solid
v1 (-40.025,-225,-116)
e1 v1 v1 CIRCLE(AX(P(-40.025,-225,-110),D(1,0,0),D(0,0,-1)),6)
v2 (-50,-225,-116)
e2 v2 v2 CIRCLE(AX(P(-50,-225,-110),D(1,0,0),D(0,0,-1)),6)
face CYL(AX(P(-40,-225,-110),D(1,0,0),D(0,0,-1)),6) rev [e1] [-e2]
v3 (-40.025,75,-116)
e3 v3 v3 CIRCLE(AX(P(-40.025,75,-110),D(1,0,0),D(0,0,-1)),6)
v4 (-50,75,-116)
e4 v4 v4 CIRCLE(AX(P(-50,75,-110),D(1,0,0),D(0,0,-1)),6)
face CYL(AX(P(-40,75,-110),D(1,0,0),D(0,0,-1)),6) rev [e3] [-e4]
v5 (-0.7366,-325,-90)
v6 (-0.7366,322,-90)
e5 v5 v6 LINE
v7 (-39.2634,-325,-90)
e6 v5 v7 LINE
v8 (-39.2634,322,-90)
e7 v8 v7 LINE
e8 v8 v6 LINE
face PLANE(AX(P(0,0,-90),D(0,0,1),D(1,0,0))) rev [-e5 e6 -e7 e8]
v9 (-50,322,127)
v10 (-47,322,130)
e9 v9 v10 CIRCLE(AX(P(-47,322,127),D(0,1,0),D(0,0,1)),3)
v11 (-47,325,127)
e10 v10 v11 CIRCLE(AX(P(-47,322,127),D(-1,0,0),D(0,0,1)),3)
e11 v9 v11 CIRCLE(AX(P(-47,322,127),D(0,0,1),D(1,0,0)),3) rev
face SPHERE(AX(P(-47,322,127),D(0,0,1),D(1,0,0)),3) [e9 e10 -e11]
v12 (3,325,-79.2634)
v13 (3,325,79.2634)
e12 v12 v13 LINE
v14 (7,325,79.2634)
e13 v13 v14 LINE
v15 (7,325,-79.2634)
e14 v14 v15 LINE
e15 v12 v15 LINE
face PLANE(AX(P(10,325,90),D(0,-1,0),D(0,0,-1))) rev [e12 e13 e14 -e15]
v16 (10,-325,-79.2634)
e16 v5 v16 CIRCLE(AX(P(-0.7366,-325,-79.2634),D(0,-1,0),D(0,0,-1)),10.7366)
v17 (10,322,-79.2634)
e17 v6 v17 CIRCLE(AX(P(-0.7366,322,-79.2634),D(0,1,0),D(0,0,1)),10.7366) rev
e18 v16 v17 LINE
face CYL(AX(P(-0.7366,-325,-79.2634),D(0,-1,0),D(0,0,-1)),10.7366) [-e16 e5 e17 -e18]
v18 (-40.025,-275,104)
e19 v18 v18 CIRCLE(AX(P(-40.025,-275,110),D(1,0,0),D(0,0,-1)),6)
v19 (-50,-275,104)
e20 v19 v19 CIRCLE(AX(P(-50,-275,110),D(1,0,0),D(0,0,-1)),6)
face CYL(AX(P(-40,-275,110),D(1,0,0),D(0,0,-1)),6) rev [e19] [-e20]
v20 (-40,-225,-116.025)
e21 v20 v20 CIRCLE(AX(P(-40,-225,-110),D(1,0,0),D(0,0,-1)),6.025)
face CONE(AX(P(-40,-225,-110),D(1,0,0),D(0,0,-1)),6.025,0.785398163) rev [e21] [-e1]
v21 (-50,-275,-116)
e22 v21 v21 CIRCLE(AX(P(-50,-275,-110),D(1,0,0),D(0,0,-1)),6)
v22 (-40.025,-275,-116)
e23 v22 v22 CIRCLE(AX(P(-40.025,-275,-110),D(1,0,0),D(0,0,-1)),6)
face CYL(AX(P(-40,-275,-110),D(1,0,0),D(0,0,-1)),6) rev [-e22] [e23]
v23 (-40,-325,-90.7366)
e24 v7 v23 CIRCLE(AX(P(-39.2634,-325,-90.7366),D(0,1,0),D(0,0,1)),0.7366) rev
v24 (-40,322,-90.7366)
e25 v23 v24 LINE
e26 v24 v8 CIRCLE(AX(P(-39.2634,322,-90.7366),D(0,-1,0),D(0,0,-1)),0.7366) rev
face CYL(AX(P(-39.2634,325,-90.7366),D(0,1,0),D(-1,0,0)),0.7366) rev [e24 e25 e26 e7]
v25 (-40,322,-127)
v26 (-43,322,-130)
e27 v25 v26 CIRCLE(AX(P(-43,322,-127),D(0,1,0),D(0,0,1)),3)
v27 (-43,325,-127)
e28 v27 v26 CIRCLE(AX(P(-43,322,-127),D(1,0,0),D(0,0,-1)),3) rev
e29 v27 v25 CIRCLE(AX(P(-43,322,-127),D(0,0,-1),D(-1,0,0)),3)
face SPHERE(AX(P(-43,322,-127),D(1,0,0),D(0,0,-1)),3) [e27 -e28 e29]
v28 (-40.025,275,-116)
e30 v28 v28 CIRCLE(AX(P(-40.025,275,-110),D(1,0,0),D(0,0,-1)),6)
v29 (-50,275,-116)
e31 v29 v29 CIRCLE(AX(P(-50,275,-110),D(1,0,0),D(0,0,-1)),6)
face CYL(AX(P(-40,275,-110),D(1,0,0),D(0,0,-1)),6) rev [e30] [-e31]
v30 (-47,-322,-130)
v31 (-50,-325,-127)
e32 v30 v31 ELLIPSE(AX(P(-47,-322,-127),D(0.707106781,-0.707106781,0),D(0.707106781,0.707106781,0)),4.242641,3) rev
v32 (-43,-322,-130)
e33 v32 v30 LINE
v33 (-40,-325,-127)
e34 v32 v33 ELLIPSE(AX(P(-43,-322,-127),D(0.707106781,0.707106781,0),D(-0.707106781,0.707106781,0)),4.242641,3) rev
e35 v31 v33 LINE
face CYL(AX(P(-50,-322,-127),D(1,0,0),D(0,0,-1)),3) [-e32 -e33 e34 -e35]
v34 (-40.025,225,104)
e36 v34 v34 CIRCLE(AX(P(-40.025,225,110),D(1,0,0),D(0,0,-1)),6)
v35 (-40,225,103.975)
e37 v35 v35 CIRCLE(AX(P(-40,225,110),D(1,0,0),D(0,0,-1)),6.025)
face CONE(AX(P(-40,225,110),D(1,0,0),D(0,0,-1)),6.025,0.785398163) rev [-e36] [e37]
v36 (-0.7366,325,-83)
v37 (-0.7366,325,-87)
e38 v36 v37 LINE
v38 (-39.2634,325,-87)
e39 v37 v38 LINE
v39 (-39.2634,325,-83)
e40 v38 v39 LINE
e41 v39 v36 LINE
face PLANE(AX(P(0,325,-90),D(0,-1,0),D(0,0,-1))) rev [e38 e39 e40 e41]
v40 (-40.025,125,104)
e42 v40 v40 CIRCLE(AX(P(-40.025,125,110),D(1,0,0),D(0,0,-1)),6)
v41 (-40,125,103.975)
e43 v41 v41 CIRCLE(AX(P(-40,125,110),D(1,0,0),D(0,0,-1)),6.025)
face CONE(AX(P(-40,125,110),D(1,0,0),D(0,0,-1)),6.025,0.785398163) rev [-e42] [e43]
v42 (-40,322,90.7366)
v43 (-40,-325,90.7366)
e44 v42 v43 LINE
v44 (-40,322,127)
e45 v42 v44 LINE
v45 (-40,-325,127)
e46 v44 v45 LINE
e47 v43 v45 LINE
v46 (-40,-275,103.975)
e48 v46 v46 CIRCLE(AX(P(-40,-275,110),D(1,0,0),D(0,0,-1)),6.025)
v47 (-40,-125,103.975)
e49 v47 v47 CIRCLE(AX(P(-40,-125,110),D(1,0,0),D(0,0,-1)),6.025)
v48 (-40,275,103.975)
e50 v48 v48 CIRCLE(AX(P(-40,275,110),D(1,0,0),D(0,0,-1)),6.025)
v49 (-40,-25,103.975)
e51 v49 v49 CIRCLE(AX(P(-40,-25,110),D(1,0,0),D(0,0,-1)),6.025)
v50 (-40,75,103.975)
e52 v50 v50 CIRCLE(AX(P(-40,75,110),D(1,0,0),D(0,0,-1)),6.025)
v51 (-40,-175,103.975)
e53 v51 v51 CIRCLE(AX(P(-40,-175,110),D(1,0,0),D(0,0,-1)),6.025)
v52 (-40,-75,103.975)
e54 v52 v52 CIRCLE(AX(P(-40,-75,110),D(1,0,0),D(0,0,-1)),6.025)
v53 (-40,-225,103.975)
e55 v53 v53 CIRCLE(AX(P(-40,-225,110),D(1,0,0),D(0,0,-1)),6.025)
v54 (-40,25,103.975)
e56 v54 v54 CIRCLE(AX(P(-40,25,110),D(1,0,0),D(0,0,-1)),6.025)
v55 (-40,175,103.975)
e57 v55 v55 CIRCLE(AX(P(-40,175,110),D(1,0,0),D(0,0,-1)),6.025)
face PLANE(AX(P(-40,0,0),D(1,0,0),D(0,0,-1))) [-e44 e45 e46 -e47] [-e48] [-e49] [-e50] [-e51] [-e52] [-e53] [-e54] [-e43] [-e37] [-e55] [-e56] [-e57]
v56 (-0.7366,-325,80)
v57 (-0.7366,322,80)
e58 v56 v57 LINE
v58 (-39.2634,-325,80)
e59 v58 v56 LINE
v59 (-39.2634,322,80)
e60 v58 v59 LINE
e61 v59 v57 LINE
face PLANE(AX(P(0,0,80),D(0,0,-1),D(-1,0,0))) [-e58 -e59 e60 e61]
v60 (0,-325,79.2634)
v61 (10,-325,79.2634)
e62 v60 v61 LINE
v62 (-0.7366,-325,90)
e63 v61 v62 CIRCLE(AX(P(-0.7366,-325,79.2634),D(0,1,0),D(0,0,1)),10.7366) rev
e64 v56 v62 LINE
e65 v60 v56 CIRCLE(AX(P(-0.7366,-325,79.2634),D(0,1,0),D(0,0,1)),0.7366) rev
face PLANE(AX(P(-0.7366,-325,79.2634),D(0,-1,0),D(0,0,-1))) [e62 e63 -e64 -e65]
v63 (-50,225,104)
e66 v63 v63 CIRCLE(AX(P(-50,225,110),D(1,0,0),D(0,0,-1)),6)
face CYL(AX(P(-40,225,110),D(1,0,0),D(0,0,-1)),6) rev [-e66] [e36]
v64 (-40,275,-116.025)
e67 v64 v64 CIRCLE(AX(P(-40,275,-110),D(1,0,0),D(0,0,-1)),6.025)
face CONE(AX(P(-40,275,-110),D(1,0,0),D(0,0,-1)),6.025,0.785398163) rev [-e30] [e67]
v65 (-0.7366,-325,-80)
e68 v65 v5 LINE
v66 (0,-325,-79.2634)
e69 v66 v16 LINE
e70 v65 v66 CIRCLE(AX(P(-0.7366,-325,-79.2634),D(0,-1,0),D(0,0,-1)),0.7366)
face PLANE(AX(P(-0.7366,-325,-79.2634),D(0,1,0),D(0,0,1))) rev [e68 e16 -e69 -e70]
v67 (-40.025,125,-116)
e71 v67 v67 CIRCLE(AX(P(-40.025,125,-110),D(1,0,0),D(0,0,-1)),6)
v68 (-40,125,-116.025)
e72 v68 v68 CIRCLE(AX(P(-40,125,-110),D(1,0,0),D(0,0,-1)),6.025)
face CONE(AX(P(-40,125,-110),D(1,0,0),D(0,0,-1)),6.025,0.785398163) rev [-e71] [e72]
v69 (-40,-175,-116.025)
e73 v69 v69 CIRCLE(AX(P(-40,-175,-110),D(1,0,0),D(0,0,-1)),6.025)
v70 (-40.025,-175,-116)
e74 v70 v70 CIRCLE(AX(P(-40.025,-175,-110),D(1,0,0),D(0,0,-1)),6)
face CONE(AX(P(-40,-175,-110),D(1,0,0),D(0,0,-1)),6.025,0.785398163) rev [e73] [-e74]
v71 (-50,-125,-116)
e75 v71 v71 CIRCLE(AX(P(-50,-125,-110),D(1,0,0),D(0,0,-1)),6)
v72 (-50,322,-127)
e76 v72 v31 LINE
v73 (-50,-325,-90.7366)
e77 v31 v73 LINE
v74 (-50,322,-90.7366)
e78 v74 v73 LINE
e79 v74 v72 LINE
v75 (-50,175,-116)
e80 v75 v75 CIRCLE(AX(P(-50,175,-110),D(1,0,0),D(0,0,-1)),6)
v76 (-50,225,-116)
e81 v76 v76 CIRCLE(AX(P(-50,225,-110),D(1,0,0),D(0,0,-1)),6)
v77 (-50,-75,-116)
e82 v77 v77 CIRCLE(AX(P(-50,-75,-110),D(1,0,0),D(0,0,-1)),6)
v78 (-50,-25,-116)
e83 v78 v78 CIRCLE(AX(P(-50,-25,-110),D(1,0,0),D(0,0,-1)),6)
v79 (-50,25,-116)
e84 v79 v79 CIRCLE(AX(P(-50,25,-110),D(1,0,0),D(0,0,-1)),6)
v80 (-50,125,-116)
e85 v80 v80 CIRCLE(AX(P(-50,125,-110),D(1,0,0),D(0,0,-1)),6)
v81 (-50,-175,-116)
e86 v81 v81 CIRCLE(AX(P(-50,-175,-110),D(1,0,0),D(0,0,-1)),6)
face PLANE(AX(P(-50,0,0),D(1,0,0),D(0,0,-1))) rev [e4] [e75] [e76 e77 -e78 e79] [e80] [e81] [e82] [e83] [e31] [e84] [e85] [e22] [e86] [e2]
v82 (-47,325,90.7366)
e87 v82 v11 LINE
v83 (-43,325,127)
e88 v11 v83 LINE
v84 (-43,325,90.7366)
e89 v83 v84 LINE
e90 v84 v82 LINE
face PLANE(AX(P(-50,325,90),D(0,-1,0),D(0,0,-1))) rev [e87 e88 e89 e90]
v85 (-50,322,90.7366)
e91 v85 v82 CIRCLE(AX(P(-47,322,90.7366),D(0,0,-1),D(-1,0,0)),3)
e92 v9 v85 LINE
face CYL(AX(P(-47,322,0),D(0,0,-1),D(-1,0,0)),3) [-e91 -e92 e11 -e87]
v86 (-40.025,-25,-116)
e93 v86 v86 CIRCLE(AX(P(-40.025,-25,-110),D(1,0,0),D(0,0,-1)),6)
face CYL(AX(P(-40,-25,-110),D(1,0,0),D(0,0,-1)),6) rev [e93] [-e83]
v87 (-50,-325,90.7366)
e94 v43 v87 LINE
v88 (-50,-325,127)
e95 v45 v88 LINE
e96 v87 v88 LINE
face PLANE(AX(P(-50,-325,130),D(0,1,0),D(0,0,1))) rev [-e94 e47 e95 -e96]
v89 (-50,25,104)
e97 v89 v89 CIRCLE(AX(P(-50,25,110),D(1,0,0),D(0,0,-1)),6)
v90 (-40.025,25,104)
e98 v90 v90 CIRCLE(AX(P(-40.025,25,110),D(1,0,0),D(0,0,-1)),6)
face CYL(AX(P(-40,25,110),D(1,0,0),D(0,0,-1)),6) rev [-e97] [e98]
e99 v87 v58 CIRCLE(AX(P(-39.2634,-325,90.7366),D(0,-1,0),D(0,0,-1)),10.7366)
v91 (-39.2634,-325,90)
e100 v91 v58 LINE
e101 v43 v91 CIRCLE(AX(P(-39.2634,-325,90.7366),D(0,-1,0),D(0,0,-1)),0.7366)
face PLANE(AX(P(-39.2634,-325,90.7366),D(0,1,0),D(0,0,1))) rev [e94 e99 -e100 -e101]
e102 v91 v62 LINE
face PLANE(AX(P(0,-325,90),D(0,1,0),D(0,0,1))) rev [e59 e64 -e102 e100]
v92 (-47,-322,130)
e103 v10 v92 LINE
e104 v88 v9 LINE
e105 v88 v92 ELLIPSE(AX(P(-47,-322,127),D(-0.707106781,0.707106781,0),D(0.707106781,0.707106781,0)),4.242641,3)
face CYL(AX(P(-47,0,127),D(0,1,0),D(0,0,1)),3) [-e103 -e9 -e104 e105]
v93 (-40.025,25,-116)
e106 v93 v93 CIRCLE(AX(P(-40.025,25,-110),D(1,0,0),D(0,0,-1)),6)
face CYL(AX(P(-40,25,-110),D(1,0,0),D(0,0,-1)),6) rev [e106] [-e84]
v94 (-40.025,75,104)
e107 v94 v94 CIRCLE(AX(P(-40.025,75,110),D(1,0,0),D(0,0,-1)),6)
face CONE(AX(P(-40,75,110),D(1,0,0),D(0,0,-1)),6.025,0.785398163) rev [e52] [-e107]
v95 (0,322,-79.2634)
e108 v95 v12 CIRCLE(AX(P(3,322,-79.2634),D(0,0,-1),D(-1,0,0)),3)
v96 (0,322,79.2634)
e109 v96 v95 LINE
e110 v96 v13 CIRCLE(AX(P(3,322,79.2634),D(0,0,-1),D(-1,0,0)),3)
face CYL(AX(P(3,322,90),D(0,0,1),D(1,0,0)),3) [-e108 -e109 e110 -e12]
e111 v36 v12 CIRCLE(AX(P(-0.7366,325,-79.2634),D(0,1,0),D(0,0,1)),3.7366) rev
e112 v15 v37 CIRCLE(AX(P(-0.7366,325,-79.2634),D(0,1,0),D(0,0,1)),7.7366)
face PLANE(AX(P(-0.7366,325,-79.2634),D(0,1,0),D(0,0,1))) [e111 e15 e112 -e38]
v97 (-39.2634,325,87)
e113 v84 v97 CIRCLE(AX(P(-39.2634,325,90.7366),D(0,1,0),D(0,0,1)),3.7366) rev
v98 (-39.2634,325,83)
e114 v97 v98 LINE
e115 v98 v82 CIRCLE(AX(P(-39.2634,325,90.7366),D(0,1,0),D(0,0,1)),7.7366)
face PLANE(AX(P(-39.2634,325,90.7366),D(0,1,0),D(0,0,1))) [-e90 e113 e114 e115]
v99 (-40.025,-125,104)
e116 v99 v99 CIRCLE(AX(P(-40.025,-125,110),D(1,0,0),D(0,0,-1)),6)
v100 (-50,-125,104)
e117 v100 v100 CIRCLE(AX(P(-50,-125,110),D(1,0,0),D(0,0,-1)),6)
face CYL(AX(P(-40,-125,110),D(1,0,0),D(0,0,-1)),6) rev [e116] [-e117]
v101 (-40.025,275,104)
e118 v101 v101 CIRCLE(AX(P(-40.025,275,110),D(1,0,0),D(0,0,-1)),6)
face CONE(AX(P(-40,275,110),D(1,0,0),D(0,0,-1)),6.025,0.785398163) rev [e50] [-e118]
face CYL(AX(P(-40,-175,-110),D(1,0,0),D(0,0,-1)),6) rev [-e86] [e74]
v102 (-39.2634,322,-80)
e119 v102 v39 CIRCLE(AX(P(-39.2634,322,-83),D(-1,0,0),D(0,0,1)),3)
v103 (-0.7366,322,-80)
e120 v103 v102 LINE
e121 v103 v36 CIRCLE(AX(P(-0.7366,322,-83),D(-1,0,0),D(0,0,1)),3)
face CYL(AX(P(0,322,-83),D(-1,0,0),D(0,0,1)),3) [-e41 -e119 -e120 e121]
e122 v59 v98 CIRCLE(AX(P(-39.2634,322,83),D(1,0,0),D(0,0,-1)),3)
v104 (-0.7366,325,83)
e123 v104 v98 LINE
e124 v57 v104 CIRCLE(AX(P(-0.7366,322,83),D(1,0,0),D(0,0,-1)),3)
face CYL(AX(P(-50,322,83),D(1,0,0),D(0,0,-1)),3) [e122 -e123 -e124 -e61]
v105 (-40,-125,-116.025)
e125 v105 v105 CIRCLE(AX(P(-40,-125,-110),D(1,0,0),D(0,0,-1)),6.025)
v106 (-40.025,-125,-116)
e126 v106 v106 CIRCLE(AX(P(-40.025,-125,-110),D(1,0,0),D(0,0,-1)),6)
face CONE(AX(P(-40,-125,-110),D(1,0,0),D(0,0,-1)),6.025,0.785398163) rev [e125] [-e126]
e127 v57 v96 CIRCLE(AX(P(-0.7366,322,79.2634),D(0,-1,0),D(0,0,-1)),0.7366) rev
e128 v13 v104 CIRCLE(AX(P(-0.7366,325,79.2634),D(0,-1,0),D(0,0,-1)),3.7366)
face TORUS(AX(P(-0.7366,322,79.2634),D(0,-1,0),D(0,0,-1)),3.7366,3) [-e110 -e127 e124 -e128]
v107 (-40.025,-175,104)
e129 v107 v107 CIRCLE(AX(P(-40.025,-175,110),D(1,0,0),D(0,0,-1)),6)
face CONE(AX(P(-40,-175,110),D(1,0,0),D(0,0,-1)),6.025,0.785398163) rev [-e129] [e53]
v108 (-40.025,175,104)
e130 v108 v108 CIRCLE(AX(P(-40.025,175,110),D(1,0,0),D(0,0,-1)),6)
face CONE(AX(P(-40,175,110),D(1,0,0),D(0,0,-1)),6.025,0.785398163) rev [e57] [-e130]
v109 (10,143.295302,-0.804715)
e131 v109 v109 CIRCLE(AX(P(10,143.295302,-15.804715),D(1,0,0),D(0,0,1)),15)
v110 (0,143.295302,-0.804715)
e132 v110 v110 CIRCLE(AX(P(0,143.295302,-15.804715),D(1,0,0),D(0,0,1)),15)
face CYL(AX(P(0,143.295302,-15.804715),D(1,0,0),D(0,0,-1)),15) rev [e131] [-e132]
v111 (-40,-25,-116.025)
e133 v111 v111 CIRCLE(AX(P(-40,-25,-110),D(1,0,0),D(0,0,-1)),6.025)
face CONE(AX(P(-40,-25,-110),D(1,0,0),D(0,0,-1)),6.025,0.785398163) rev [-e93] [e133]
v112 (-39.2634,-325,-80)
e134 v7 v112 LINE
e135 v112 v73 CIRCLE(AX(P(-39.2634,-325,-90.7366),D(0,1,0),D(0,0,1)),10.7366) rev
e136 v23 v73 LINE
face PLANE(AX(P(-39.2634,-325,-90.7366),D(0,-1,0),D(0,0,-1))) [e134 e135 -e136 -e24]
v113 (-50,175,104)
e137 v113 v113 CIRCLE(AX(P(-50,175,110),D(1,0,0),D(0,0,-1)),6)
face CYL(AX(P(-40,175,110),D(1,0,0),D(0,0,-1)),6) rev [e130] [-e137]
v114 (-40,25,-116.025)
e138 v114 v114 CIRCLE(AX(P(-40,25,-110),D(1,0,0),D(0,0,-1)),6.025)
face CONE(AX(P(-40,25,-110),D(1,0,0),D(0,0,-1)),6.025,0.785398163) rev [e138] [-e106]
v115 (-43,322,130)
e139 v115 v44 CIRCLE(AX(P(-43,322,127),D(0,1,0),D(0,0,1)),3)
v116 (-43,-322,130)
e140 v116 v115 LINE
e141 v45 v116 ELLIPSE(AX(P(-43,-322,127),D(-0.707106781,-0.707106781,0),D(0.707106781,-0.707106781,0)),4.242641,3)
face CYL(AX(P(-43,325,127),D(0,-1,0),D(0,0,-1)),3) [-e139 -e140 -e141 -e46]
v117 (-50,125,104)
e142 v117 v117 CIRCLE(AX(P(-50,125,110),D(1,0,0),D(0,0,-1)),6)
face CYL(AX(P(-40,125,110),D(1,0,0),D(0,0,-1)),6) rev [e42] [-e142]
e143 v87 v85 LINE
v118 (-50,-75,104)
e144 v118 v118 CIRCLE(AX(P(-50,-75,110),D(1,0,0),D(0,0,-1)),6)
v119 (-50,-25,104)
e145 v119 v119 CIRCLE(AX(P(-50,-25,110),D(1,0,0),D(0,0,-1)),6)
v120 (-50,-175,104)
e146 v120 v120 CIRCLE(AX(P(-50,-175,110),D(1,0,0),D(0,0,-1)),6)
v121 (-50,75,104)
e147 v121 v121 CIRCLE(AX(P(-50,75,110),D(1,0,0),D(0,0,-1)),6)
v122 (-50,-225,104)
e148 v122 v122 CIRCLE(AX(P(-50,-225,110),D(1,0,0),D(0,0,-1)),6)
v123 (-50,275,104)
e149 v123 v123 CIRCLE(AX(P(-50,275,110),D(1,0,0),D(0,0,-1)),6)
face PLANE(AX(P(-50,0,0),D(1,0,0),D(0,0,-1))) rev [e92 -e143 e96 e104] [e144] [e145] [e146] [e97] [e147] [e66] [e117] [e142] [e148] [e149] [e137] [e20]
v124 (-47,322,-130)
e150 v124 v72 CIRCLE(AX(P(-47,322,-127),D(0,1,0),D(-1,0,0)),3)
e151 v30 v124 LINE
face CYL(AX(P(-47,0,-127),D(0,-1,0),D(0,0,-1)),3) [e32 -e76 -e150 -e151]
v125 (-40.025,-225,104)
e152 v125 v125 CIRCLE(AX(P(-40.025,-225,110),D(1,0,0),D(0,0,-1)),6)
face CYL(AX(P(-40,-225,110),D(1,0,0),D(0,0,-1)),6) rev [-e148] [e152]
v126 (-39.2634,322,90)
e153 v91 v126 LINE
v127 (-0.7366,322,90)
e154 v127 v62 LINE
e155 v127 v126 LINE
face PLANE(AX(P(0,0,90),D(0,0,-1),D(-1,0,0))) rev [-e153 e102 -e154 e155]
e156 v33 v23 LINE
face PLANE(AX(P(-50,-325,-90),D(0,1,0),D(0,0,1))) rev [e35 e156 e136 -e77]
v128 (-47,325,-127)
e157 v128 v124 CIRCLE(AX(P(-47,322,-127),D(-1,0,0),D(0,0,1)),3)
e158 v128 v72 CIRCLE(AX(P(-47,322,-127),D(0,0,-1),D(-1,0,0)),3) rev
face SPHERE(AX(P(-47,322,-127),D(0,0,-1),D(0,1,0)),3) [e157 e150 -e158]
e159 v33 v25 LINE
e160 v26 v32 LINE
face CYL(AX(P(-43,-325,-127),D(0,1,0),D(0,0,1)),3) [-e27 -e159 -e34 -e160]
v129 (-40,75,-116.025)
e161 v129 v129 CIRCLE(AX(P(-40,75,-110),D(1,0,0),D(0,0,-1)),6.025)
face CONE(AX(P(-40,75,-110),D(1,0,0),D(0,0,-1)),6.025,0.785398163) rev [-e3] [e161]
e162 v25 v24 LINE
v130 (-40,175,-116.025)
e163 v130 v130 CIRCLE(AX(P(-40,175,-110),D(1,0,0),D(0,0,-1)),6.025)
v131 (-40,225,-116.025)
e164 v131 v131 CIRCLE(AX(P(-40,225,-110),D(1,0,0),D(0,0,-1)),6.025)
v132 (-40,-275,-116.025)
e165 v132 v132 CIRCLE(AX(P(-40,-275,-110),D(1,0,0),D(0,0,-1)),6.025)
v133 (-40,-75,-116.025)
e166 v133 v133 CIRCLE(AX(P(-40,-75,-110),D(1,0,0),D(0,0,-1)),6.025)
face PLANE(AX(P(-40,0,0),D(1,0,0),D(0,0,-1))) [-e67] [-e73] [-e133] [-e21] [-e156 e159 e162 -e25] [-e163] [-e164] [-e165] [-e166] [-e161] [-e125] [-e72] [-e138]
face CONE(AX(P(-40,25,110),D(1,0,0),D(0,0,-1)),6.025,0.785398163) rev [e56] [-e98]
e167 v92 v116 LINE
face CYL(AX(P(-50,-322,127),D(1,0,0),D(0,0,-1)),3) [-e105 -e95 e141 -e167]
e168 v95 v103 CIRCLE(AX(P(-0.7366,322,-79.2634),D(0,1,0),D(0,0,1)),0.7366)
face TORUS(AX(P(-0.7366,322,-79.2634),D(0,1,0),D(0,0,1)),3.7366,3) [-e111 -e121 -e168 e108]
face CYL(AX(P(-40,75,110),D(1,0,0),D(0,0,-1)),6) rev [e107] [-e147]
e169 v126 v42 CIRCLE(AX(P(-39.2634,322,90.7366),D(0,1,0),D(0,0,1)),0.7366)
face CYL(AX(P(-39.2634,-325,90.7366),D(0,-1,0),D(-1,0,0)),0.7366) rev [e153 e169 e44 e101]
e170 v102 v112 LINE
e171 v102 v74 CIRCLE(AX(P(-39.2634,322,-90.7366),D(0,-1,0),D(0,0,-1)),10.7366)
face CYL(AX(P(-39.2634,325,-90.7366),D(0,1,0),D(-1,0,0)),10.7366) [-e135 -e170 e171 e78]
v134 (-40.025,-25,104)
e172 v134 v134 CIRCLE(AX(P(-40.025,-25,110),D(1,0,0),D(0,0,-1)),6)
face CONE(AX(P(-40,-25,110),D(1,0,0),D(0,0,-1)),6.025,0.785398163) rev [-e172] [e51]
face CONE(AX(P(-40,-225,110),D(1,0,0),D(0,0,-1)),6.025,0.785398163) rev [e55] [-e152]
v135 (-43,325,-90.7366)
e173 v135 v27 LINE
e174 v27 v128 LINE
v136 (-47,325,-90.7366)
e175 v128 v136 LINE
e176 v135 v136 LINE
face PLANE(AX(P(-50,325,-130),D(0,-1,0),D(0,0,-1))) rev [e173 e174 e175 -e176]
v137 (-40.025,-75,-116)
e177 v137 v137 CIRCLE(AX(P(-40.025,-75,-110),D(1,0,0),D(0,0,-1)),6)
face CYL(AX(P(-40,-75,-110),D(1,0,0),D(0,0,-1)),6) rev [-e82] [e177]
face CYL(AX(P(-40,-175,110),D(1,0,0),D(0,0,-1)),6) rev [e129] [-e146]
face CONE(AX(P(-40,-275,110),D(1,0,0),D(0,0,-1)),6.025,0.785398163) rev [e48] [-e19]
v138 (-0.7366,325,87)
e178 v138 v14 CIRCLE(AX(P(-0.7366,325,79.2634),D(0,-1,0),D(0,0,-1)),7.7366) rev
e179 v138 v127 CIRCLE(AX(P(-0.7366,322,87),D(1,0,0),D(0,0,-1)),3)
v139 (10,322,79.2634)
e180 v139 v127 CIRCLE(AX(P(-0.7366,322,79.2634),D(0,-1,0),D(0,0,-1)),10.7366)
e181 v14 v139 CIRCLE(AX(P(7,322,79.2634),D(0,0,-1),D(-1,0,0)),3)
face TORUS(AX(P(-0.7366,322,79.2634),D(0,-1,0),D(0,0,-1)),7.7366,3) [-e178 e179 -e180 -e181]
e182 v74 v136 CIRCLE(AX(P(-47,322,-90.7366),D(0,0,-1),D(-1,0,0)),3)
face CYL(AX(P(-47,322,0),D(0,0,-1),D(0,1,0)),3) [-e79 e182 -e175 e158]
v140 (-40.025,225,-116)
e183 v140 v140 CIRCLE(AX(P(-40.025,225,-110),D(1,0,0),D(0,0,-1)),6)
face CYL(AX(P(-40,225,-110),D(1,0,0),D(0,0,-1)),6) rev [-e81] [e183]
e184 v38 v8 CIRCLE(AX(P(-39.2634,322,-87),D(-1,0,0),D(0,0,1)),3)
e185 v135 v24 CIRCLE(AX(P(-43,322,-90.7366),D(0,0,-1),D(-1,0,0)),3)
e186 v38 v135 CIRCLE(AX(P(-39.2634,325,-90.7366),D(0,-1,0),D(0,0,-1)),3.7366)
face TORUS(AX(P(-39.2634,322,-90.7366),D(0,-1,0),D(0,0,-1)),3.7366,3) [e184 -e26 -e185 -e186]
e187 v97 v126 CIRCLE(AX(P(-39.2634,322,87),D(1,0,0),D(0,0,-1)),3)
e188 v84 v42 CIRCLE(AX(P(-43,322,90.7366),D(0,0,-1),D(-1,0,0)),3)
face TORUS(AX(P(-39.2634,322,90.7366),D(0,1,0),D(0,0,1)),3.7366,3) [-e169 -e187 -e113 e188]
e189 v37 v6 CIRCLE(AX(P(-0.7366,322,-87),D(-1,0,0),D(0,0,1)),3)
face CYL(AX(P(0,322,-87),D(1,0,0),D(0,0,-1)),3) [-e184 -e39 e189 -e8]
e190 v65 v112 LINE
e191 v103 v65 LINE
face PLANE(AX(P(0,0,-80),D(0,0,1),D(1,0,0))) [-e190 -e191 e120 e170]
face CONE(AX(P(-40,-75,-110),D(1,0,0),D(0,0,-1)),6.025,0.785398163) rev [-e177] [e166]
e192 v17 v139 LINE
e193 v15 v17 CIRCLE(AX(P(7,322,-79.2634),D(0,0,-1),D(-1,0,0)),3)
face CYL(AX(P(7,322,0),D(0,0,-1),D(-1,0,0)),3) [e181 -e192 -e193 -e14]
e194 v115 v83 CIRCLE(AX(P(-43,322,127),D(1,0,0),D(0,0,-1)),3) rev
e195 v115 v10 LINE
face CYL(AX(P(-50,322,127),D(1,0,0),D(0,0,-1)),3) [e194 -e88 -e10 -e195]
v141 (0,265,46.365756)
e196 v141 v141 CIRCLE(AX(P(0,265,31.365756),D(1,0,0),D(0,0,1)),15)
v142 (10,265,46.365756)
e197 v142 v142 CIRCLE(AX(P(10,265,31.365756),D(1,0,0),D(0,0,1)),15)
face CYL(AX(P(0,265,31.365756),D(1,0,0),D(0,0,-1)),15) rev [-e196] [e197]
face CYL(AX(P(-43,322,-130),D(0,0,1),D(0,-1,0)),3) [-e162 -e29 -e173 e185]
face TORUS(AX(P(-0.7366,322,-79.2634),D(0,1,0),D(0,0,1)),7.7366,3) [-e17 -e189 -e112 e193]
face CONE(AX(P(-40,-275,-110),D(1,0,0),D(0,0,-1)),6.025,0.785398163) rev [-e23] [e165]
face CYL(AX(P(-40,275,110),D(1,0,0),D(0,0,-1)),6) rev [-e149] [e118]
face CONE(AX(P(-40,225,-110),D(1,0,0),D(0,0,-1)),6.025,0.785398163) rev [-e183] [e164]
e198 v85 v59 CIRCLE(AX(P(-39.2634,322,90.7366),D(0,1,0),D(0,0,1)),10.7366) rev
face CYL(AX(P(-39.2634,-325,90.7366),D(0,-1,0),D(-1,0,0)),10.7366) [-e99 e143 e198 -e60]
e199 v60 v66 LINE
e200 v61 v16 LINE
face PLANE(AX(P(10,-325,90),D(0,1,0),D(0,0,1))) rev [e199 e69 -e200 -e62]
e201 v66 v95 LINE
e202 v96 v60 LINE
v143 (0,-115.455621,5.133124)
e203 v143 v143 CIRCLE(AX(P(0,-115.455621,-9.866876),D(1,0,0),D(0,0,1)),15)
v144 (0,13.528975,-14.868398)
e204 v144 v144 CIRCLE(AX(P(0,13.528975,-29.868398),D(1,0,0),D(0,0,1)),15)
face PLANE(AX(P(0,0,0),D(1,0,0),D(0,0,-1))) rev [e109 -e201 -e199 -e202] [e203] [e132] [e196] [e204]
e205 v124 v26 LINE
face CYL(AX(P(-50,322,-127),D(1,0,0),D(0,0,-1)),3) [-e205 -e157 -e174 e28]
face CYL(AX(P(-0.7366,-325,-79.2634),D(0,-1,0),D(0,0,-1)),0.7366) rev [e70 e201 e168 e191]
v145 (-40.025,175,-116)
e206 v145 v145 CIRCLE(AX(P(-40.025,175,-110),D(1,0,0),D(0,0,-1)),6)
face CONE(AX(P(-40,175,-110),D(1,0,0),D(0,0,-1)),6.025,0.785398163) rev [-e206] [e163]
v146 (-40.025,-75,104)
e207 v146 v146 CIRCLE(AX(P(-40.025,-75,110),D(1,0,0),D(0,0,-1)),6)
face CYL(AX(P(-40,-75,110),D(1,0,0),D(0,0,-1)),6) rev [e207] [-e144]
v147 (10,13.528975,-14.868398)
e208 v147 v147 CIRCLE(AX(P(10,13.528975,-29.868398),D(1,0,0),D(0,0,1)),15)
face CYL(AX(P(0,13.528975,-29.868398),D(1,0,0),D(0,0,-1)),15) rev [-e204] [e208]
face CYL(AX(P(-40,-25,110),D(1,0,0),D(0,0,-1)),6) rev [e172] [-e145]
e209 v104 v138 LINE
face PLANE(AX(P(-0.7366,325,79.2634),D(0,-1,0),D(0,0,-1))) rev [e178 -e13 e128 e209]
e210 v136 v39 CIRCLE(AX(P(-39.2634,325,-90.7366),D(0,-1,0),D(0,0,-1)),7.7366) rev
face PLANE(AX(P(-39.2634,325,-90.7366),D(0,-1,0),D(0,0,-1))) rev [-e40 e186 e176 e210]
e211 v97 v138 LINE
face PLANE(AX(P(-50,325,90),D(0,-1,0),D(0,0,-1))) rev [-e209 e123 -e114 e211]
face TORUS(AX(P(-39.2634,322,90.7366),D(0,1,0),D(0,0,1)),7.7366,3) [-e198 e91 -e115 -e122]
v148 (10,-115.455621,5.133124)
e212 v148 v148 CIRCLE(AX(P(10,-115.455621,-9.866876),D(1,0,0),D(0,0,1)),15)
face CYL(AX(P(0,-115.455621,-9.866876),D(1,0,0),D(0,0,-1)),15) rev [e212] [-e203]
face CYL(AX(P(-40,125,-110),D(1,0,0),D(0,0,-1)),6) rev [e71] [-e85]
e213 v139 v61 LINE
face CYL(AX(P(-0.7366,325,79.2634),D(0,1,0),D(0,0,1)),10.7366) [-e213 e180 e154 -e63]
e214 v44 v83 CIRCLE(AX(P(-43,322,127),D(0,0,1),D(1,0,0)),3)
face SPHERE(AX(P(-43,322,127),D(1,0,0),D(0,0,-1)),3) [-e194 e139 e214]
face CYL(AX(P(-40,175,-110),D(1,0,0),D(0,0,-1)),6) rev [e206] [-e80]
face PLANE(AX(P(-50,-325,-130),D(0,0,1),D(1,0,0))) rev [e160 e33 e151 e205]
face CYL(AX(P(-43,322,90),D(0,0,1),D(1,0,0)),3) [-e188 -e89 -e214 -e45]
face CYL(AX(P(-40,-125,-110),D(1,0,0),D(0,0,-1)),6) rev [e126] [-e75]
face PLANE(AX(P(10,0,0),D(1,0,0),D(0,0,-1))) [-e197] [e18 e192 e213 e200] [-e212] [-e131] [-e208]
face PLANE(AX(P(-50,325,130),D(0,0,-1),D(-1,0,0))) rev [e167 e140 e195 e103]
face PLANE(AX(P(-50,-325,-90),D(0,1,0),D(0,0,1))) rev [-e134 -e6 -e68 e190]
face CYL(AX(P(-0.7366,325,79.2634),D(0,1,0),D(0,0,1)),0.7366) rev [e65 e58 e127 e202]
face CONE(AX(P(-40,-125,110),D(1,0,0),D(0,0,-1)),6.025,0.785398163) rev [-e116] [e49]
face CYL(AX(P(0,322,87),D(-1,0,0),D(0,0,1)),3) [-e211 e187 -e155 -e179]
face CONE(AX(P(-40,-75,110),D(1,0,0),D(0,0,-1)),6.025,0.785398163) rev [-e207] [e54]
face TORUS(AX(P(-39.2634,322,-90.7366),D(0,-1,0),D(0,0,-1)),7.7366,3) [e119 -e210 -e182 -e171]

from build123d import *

# Parameters (mm, degrees)
SKETCH1_W                       = 180
SKETCH1_H                       = 650
BASE_FLANGE1_DEPTH              = 10
EDGE_FLANGE1_STRIP_W            = 41.4732
EDGE_FLANGE1_STRIP_H            = 10
EDGE_FLANGE1_STRIP_CUT_DEPTH    = 650
EDGE_FLANGE1_STRIP_2_W          = 41.4732
EDGE_FLANGE1_STRIP_2_H          = 10
EDGE_FLANGE1_STRIP_CUT_2_DEPTH  = 650
EDGE_FLANGE1_DEPTH              = 650
EDGE_FLANGE1_BEND_DEPTH         = 650
EDGE_FLANGE2_STRIP_W            = 41.4732
EDGE_FLANGE2_STRIP_H            = 10
EDGE_FLANGE2_STRIP_CUT_DEPTH    = 650
EDGE_FLANGE2_STRIP_2_W          = 41.4732
EDGE_FLANGE2_STRIP_2_H          = 10
EDGE_FLANGE2_STRIP_CUT_2_DEPTH  = 650
EDGE_FLANGE2_DEPTH              = 650
EDGE_FLANGE2_BEND_DEPTH         = 650
SKETCH18_R                      = 15
CUT_EXTRUDE1_DEPTH              = 10
M10_CLEARANCE_HOLE1_D           = 12
M10_CLEARANCE_HOLE1_CSINK_D     = 12.05
M10_CLEARANCE_HOLE1_CSINK_ANGLE = 90
FILLET1_R                       = 3


# Sheet-metal steps are written as plain solids
with BuildPart() as part:
    # Sketch1 → Base-Flange1 (new body)
    with BuildSketch(Plane(origin=(0, 0, 0), x_dir=(0, 0, -1), z_dir=(1, 0, 0))):
        Rectangle(SKETCH1_W, SKETCH1_H)
    extrude(amount=BASE_FLANGE1_DEPTH)

    # Edge-Flange1 strip (across the edge) → Edge-Flange1 strip cut (cut)
    with BuildSketch(Plane(origin=(0, -325, 90), x_dir=(0, 0, -1), z_dir=(0, 1, 0))):
        with Locations((-10, -5)):
            Rectangle(EDGE_FLANGE1_STRIP_W, EDGE_FLANGE1_STRIP_H)
    extrude(amount=EDGE_FLANGE1_STRIP_CUT_DEPTH, mode=Mode.SUBTRACT)

    # Edge-Flange1 strip 2 (across the edge) → Edge-Flange1 strip cut 2 (cut)
    with BuildSketch(Plane(origin=(0, 325, -90), x_dir=(0, 0, 1), z_dir=(0, -1, 0))):
        with Locations((-10, -5)):
            Rectangle(EDGE_FLANGE1_STRIP_2_W, EDGE_FLANGE1_STRIP_2_H)
    extrude(amount=EDGE_FLANGE1_STRIP_CUT_2_DEPTH, mode=Mode.SUBTRACT)

    # Edge-Flange1 section (across the edge) → Edge-Flange1 (add)
    with BuildSketch(Plane(origin=(0, -325, 90), x_dir=(0, 0, -1), z_dir=(0, 1, 0))):
        with BuildLine():
            Line((0, 0.7366), (0, 50))
            Line((0, 50), (10, 50))
            Line((10, 50), (10, 0.7366))
            ThreePointArc((10, 0.7366), (10.215745145, 0.215745145), (10.7366, 0))
            Line((10.7366, 0), (10.7366, -10))
            ThreePointArc((10.7366, -10), (3.144677333, -6.855322667), (0, 0.7366))
        make_face()
    extrude(amount=EDGE_FLANGE1_DEPTH)

    # Edge-Flange1 section 2 (across the edge) → Edge-Flange1 bend (add)
    with BuildSketch(Plane(origin=(0, 325, -90), x_dir=(0, 0, 1), z_dir=(0, -1, 0))):
        with BuildLine():
            Line((0, 0.7366), (0, 50))
            Line((0, 50), (10, 50))
            Line((10, 50), (10, 0.7366))
            ThreePointArc((10, 0.7366), (10.215745145, 0.215745145), (10.7366, 0))
            Line((10.7366, 0), (10.7366, -10))
            ThreePointArc((10.7366, -10), (3.144677333, -6.855322667), (0, 0.7366))
        make_face()
    extrude(amount=EDGE_FLANGE1_BEND_DEPTH)

    # Edge-Flange2 strip (across the edge) → Edge-Flange2 strip cut (cut)
    with BuildSketch(Plane(origin=(-50, 325, 90), x_dir=(1, 0, 0), z_dir=(0, -1, 0))):
        with Locations((-10, -5)):
            Rectangle(EDGE_FLANGE2_STRIP_W, EDGE_FLANGE2_STRIP_H)
    extrude(amount=EDGE_FLANGE2_STRIP_CUT_DEPTH, mode=Mode.SUBTRACT)

    # Edge-Flange2 strip 2 (across the edge) → Edge-Flange2 strip cut 2 (cut)
    with BuildSketch(Plane(origin=(-50, -325, -90), x_dir=(1, 0, 0), z_dir=(0, 1, 0))):
        with Locations((-10, -5)):
            Rectangle(EDGE_FLANGE2_STRIP_2_W, EDGE_FLANGE2_STRIP_2_H)
    extrude(amount=EDGE_FLANGE2_STRIP_CUT_2_DEPTH, mode=Mode.SUBTRACT)

    # Edge-Flange2 section (across the edge) → Edge-Flange2 (add)
    with BuildSketch(Plane(origin=(-50, 325, 90), x_dir=(1, 0, 0), z_dir=(0, -1, 0))):
        with BuildLine():
            Line((0, 0.7366), (0, 40))
            Line((0, 40), (10, 40))
            Line((10, 40), (10, 0.7366))
            ThreePointArc((10, 0.7366), (10.215745145, 0.215745145), (10.7366, 0))
            Line((10.7366, 0), (10.7366, -10))
            ThreePointArc((10.7366, -10), (3.144677333, -6.855322667), (0, 0.7366))
        make_face()
    extrude(amount=EDGE_FLANGE2_DEPTH)

    # Edge-Flange2 section 2 (across the edge) → Edge-Flange2 bend (add)
    with BuildSketch(Plane(origin=(-50, -325, -90), x_dir=(1, 0, 0), z_dir=(0, 1, 0))):
        with BuildLine():
            Line((0, 0.7366), (0, 40))
            Line((0, 40), (10, 40))
            Line((10, 40), (10, 0.7366))
            ThreePointArc((10, 0.7366), (10.215745145, 0.215745145), (10.7366, 0))
            Line((10.7366, 0), (10.7366, -10))
            ThreePointArc((10.7366, -10), (3.144677333, -6.855322667), (0, 0.7366))
        make_face()
    extrude(amount=EDGE_FLANGE2_BEND_DEPTH)

    # Sketch18 → Cut-Extrude1 (cut)
    with BuildSketch(Plane(origin=(10, 0, 0), x_dir=(0, 0, -1), z_dir=(1, 0, 0))):
        with Locations(Location((-31.365756011, 265, 0), (0, 0, 180))):
            Circle(SKETCH18_R)
        with Locations(Location((15.804715389, 143.295302131, 0), (0, 0, 180))):
            Circle(SKETCH18_R)
        with Locations(Location((29.868398264, 13.528974914, 0), (0, 0, 180))):
            Circle(SKETCH18_R)
        with Locations(Location((9.86687587, -115.455620901, 0), (0, 0, 180))):
            Circle(SKETCH18_R)
    extrude(amount=-CUT_EXTRUDE1_DEPTH, mode=Mode.SUBTRACT)

    # M10 Clearance Hole1 (through all)
    with Locations(Plane(origin=(-40, 0, 0), x_dir=(0, 0, -1), z_dir=(1, 0, 0))):
        with Locations((-110, -275), (-110, -225), (-110, -175), (-110, -125), (-110, -75), (-110, -25), (-110, 25), (-110, 75), (-110, 125), (-110, 175), (-110, 225), (-110, 275)):
            m10_clearance_hole1 = CounterSinkHole(M10_CLEARANCE_HOLE1_D / 2, M10_CLEARANCE_HOLE1_CSINK_D / 2, counter_sink_angle=M10_CLEARANCE_HOLE1_CSINK_ANGLE)

    # Mirror1: M10 Clearance Hole1 across plane
    add(m10_clearance_hole1.mirror(Plane.XY), mode=Mode.SUBTRACT)

    # Fillet1
    fillet1_edges = [part.edges().sort_by_distance(p)[0] for p in [
        (-46.855322667, 325, 83.144677333),
        (-39.784254855, 325, 90.215745145),
        (-45, 325, 130),
        (-40, 325, 110.3683),
        (-50, 0, 130),
        (-50, 325, 110.3683),
        (-40, 0, 130),
        (-45, -325, 130),
        (-46.855322667, 325, -83.144677333),
        (-39.784254855, 325, -90.215745145),
        (-45, -325, -130),
        (-40, 325, -110.3683),
        (-50, 325, -110.3683),
        (-50, 0, -130),
        (-40, 0, -130),
        (-45, 325, -130),
        (0, 325, 0),
        (10, 325, 0),
        (6.855322667, 325, 86.855322667),
        (-0.215745145, 325, 79.784254855),
        (-20, 325, 80),
        (-20, 325, 90),
        (6.855322667, 325, -86.855322667),
        (-0.215745145, 325, -79.784254855),
        (-20, 325, -80),
        (-20, 325, -90),
    ]]
    fillet(fillet1_edges, radius=FILLET1_R)


solid = part.part
